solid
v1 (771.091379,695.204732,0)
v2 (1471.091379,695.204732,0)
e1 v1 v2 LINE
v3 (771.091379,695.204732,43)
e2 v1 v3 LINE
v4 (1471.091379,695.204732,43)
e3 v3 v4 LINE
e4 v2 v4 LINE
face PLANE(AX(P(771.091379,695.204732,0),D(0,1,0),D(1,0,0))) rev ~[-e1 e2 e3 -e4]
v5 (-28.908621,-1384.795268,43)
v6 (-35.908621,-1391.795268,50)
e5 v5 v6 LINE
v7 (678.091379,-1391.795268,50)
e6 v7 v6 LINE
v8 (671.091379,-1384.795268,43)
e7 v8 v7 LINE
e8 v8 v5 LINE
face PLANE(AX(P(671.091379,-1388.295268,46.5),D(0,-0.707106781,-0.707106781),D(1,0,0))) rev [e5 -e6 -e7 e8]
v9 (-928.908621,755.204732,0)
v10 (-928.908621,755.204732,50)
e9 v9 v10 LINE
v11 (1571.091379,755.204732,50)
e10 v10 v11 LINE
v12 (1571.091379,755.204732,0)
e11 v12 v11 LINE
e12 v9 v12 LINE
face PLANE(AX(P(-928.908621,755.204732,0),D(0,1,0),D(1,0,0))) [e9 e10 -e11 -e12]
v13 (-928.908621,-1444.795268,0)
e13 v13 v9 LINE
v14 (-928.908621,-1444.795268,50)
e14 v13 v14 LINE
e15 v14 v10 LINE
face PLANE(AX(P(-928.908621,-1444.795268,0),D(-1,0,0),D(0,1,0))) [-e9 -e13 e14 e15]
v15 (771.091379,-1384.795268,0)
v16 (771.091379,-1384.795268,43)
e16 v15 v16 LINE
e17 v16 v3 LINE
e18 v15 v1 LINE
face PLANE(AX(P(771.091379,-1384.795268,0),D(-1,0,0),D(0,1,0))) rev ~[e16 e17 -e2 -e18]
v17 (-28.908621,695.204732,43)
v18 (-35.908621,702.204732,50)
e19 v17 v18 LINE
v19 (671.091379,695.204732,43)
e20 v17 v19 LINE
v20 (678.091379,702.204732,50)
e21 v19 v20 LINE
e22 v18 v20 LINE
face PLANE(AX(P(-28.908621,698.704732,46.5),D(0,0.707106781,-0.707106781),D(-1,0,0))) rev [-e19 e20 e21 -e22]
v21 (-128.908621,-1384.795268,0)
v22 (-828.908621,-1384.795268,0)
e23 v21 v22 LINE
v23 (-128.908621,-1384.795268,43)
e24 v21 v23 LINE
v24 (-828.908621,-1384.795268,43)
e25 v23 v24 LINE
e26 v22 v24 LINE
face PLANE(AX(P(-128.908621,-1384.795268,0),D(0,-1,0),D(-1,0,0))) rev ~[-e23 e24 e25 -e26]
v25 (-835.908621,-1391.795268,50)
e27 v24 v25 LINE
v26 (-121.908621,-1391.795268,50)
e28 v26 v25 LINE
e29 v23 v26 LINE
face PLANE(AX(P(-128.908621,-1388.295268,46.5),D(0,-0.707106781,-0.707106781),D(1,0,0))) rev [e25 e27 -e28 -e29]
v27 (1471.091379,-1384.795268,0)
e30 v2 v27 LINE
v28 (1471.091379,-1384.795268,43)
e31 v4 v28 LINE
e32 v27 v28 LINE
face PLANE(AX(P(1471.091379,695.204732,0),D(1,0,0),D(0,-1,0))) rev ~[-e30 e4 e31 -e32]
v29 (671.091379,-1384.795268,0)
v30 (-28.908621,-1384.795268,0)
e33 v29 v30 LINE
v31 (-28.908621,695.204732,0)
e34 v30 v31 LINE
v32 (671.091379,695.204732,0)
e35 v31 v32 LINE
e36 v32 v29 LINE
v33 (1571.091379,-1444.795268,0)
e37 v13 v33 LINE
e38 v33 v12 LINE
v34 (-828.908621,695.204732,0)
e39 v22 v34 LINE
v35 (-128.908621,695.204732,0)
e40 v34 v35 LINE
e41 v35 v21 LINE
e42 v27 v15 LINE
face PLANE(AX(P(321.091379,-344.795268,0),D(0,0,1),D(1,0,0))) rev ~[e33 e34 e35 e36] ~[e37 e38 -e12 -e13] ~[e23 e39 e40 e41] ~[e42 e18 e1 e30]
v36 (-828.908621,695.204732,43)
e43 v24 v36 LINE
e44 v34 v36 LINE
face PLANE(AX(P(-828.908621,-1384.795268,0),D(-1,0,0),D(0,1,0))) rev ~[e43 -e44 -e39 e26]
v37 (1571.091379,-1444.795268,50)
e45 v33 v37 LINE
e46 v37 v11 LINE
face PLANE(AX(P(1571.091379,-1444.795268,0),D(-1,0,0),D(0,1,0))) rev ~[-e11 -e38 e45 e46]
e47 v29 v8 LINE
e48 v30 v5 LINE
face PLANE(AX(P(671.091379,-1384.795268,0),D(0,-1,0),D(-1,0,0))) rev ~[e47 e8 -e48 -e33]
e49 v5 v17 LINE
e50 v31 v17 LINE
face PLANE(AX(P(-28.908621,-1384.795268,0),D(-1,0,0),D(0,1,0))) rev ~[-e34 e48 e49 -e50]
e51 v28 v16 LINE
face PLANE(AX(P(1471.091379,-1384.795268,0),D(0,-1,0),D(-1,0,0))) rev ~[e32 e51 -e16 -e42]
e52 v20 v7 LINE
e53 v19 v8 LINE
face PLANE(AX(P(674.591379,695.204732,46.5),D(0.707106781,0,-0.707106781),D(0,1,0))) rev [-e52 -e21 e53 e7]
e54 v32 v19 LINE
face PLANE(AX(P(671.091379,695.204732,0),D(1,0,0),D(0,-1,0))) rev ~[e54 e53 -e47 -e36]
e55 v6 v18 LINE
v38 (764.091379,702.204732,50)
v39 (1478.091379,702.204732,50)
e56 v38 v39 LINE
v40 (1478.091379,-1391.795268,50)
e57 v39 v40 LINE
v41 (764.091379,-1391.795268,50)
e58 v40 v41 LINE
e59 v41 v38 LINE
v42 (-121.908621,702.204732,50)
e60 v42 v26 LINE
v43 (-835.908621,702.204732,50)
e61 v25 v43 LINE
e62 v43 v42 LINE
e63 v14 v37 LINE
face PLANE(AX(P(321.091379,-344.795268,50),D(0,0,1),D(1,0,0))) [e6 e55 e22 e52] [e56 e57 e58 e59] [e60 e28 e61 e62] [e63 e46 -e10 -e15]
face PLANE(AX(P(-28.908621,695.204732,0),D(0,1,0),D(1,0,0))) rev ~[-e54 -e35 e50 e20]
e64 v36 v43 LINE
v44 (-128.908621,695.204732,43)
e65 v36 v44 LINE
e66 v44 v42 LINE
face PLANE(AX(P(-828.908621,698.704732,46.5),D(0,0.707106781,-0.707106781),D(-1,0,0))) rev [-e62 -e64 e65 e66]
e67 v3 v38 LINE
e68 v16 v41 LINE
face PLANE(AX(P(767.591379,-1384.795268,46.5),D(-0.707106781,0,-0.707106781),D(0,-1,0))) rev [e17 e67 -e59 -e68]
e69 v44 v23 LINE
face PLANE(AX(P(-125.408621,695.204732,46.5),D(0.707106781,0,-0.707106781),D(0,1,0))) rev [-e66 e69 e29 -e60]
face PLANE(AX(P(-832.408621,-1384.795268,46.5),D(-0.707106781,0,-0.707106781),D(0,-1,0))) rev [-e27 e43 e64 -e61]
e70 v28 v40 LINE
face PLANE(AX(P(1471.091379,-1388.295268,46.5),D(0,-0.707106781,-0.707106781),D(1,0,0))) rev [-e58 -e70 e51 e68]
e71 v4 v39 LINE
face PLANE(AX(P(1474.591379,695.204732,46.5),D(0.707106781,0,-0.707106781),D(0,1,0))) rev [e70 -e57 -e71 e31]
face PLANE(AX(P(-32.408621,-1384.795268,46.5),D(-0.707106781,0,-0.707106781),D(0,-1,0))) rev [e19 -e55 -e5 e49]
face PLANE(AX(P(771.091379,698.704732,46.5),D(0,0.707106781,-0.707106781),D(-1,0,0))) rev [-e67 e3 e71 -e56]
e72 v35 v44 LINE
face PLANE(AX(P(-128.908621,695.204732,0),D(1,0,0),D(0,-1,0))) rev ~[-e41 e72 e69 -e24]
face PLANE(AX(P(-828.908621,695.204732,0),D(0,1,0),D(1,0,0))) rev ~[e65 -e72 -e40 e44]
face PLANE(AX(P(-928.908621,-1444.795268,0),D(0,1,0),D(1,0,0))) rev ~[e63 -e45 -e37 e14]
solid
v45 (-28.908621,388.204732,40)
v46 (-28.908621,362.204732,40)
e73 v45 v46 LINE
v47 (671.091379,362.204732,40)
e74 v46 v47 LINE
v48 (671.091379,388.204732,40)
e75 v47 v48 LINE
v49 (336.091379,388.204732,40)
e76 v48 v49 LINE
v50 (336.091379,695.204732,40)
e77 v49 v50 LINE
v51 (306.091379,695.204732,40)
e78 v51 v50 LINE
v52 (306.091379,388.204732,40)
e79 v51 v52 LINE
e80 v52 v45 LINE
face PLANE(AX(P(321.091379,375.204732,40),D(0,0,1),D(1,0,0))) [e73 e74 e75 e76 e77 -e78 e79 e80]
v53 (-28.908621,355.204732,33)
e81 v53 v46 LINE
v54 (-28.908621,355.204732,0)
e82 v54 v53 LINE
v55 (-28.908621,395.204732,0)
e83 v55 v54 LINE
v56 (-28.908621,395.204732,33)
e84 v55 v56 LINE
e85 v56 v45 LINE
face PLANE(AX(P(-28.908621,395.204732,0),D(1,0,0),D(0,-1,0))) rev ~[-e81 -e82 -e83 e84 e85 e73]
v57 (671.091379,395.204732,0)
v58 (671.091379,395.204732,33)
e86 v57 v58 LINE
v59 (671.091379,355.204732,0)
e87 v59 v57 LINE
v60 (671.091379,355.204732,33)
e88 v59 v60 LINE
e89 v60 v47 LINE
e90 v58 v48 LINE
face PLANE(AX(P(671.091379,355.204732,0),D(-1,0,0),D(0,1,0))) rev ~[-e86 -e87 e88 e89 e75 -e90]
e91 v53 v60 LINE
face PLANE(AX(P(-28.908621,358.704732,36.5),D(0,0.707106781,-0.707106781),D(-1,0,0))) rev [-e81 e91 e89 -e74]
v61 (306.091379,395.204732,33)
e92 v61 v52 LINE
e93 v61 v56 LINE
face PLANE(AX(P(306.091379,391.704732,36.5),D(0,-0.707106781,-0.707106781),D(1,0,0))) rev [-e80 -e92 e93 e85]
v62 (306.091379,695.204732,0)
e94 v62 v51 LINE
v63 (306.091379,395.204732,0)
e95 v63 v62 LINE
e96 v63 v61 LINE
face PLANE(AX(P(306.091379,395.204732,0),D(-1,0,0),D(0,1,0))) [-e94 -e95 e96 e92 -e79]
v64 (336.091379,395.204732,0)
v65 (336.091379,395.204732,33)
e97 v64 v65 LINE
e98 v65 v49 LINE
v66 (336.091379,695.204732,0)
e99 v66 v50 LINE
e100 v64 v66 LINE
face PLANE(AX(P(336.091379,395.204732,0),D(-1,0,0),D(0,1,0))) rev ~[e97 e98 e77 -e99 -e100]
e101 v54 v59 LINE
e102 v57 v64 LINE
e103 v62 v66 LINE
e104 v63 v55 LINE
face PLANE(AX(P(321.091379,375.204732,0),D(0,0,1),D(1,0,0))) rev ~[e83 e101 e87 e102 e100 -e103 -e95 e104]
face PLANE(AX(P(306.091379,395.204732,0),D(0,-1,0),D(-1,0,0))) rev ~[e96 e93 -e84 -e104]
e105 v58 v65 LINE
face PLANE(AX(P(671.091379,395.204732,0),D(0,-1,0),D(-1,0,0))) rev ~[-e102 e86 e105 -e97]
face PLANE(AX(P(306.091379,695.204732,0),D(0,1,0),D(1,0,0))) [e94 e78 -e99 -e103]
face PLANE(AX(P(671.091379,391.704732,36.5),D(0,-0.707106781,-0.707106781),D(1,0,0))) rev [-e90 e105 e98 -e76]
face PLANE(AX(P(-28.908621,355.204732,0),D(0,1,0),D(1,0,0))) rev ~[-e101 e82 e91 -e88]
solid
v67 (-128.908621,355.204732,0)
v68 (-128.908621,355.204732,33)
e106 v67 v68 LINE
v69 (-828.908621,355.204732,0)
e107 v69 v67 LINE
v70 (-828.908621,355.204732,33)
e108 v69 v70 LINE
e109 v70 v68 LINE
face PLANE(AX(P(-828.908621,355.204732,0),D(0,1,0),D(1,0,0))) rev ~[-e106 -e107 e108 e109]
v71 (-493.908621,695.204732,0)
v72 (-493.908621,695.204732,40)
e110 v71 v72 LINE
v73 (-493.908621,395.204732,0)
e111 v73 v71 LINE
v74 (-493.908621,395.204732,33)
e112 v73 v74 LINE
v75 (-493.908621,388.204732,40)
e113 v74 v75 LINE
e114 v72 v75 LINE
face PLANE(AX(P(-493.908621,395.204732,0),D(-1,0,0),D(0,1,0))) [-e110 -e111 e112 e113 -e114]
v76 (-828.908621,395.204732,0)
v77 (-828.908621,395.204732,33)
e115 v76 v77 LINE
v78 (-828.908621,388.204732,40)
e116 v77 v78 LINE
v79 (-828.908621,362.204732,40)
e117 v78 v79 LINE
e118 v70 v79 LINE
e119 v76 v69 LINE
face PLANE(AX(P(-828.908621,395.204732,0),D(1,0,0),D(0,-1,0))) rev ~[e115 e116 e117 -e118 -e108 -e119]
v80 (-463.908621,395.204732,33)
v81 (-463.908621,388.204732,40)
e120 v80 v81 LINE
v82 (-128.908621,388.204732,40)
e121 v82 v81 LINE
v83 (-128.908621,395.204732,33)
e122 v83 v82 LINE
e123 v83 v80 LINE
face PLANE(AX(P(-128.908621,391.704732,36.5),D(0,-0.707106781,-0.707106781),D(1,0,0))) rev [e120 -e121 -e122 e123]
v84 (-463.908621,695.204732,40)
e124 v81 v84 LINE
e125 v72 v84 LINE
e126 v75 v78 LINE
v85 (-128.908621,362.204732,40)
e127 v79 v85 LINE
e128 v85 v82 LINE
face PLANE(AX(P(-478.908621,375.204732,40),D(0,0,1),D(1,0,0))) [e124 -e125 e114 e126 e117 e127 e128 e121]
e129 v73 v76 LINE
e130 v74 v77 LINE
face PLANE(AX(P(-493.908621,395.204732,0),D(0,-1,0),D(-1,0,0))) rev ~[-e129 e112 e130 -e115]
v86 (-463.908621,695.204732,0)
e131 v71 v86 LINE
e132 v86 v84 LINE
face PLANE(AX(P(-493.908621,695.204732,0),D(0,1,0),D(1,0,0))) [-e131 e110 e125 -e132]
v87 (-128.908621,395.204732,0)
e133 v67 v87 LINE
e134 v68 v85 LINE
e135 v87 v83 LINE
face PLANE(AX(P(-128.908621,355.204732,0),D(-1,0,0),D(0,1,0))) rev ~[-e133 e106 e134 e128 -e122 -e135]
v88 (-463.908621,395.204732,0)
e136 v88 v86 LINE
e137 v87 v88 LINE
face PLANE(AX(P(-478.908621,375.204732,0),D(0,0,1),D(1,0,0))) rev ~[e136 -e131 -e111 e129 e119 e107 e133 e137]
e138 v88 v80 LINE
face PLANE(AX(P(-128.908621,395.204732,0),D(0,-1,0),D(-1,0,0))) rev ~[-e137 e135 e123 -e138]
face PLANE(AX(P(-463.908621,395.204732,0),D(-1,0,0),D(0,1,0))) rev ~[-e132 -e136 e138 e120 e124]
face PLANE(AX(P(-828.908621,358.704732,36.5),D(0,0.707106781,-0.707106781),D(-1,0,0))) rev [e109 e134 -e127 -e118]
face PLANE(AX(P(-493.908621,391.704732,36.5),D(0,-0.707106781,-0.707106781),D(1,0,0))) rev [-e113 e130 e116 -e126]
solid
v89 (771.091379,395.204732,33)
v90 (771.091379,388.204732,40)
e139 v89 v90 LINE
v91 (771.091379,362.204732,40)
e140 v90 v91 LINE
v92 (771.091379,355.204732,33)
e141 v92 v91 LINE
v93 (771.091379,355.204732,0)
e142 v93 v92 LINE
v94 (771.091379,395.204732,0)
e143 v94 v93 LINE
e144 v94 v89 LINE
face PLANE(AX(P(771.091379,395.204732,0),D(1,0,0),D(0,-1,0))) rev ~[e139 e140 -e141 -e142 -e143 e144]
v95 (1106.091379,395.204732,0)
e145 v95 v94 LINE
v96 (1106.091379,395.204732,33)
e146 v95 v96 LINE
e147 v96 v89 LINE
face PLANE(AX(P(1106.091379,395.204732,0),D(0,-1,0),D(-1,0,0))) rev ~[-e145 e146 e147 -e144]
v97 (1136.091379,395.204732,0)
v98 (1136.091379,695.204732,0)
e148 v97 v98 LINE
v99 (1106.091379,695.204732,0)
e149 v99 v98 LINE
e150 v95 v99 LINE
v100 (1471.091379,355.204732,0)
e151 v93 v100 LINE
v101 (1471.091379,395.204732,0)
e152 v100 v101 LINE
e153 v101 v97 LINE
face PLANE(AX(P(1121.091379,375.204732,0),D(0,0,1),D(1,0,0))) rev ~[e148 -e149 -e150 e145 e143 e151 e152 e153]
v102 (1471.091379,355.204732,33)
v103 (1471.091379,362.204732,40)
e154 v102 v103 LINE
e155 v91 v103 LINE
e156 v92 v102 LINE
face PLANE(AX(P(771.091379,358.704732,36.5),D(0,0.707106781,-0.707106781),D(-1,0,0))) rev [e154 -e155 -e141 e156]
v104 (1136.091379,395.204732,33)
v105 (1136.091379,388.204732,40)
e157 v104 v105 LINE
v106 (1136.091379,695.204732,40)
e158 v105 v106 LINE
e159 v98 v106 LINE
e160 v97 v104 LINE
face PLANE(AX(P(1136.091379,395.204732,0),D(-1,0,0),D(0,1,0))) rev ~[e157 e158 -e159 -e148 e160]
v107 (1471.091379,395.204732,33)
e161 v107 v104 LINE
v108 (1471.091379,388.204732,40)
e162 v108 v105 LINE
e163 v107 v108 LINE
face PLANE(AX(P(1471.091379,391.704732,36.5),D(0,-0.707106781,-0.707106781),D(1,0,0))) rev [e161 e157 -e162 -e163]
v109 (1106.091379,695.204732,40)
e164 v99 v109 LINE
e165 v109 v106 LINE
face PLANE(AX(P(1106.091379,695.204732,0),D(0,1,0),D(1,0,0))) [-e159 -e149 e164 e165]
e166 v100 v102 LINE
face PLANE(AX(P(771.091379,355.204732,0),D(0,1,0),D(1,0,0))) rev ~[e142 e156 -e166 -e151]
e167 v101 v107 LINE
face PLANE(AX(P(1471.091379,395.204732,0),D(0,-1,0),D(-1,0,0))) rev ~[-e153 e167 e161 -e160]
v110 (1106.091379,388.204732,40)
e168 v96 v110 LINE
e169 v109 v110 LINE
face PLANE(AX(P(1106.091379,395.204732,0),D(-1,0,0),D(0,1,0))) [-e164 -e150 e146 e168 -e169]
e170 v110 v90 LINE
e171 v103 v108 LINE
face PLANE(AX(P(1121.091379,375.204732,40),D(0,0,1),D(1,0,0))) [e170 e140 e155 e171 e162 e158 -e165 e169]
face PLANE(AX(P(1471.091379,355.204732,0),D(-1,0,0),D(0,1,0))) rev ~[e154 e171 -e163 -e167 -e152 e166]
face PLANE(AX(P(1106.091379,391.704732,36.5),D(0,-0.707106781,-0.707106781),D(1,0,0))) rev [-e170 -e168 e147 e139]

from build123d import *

# Parameters (mm, degrees)
F0_W      = 2500
F0_H      = 2200
F1_DEPTH  = 50
F0_W_2    = 30
F0_H_2    = 300
F2_DEPTH  = 40
F3_SIZE   = 7
F3_2_SIZE = 7
F3_3_SIZE = 7
F3_4_SIZE = 7


# Not quite as in the source:
# - a feature names something its author has since deleted; it is built from what else it names


with BuildPart() as f1:
    # F0 (on Top) → F1 (new body)
    with BuildSketch(Plane.XY):
        with Locations((321.0913794215, -344.7952681527)):
            Rectangle(F0_W, F0_H)
        Polygon((-828.9086205785, 395.2047318473), (-828.9086205785, 695.2047318473), (-493.9086205785, 695.2047318473), (-463.9086205785, 695.2047318473), (-128.9086205785, 695.2047318473), (-28.9086205785, 695.2047318473), (306.0913794215, 695.2047318473), (336.0913794215, 695.2047318473), (671.0913794215, 695.2047318473), (771.0913794215, 695.2047318473), (1106.0913794215, 695.2047318473), (1136.0913794215, 695.2047318473), (1471.0913794215, 695.2047318473), (1471.0913794215, 395.2047318473), (1471.0913794215, 355.2047318473), (1471.0913794215, -1384.7952681527), (771.0913794215, -1384.7952681527), (671.0913794215, -1384.7952681527), (-28.9086205785, -1384.7952681527), (-128.9086205785, -1384.7952681527), (-828.9086205785, -1384.7952681527), (-828.9086205785, 355.2047318473), align=None, mode=Mode.SUBTRACT)
        Polygon((-28.9086205785, 695.2047318473), (-128.9086205785, 695.2047318473), (-128.9086205785, 395.2047318473), (-128.9086205785, 355.2047318473), (-128.9086205785, -1384.7952681527), (-28.9086205785, -1384.7952681527), (-28.9086205785, 355.2047318473), (-28.9086205785, 395.2047318473), align=None)
        Polygon((671.0913794215, 355.2047318473), (671.0913794215, -1384.7952681527), (771.0913794215, -1384.7952681527), (771.0913794215, 355.2047318473), (771.0913794215, 395.2047318473), (771.0913794215, 695.2047318473), (671.0913794215, 695.2047318473), (671.0913794215, 395.2047318473), align=None)
    extrude(amount=F1_DEPTH)

    # F3
    f3_edges = [f1.edges().sort_by_distance(p)[0] for p in [
        (-828.908621, -344.795268, 50),
        (-478.908621, 695.204732, 50),
        (-128.908621, -344.795268, 50),
        (-28.908621, -344.795268, 50),
        (321.091379, 695.204732, 50),
        (771.091379, -344.795268, 50),
        (1121.091379, 695.204732, 50),
        (671.091379, -344.795268, 50),
        (1471.091379, -344.795268, 50),
        (321.091379, -1384.795268, 50),
        (1121.091379, -1384.795268, 50),
        (-478.908621, -1384.795268, 50),
    ]]
    chamfer(f3_edges, length=F3_SIZE)


with BuildPart() as f2:
    # F0 (on Top) → F2 (new body)
    with BuildSketch(Plane.XY):
        Polygon((-493.9086205785, 395.2047318473), (-828.9086205785, 395.2047318473), (-828.9086205785, 355.2047318473), (-128.9086205785, 355.2047318473), (-128.9086205785, 395.2047318473), (-463.9086205785, 395.2047318473), align=None)
        with Locations((-478.9086205785, 545.2047318473)):
            Rectangle(F0_W_2, F0_H_2)
    extrude(amount=F2_DEPTH)

    # F3#2
    f3_2_edges = [f2.edges().sort_by_distance(p)[0] for p in [
        (-478.908621, 355.204732, 40),
        (-661.408621, 395.204732, 40),
        (-296.408621, 395.204732, 40),
    ]]
    chamfer(f3_2_edges, length=F3_2_SIZE)


with BuildPart() as f2b:
    # F0 (on Top) → F2, piece 2 (new body)
    with BuildSketch(Plane.XY):
        Polygon((306.0913794215, 395.2047318473), (-28.9086205785, 395.2047318473), (-28.9086205785, 355.2047318473), (671.0913794215, 355.2047318473), (671.0913794215, 395.2047318473), (336.0913794215, 395.2047318473), align=None)
        with Locations((321.0913794215, 545.2047318473)):
            Rectangle(F0_W_2, F0_H_2)
    extrude(amount=F2_DEPTH)

    # F3#3
    f3_3_edges = [f2b.edges().sort_by_distance(p)[0] for p in [
        (321.091379, 355.204732, 40),
        (138.591379, 395.204732, 40),
        (503.591379, 395.204732, 40),
    ]]
    chamfer(f3_3_edges, length=F3_3_SIZE)


with BuildPart() as f2c:
    # F0 (on Top) → F2, piece 3 (new body)
    with BuildSketch(Plane.XY):
        Polygon((771.0913794215, 395.2047318473), (771.0913794215, 355.2047318473), (1471.0913794215, 355.2047318473), (1471.0913794215, 395.2047318473), (1136.0913794215, 395.2047318473), (1106.0913794215, 395.2047318473), align=None)
        with Locations((1121.0913794215, 545.2047318473)):
            Rectangle(F0_W_2, F0_H_2)
    extrude(amount=F2_DEPTH)

    # F3#4
    f3_4_edges = [f2c.edges().sort_by_distance(p)[0] for p in [
        (1303.591379, 395.204732, 40),
        (938.591379, 395.204732, 40),
        (1121.091379, 355.204732, 40),
    ]]
    chamfer(f3_4_edges, length=F3_4_SIZE)


solid = Compound([f1.part, f2.part, f2b.part, f2c.part])
